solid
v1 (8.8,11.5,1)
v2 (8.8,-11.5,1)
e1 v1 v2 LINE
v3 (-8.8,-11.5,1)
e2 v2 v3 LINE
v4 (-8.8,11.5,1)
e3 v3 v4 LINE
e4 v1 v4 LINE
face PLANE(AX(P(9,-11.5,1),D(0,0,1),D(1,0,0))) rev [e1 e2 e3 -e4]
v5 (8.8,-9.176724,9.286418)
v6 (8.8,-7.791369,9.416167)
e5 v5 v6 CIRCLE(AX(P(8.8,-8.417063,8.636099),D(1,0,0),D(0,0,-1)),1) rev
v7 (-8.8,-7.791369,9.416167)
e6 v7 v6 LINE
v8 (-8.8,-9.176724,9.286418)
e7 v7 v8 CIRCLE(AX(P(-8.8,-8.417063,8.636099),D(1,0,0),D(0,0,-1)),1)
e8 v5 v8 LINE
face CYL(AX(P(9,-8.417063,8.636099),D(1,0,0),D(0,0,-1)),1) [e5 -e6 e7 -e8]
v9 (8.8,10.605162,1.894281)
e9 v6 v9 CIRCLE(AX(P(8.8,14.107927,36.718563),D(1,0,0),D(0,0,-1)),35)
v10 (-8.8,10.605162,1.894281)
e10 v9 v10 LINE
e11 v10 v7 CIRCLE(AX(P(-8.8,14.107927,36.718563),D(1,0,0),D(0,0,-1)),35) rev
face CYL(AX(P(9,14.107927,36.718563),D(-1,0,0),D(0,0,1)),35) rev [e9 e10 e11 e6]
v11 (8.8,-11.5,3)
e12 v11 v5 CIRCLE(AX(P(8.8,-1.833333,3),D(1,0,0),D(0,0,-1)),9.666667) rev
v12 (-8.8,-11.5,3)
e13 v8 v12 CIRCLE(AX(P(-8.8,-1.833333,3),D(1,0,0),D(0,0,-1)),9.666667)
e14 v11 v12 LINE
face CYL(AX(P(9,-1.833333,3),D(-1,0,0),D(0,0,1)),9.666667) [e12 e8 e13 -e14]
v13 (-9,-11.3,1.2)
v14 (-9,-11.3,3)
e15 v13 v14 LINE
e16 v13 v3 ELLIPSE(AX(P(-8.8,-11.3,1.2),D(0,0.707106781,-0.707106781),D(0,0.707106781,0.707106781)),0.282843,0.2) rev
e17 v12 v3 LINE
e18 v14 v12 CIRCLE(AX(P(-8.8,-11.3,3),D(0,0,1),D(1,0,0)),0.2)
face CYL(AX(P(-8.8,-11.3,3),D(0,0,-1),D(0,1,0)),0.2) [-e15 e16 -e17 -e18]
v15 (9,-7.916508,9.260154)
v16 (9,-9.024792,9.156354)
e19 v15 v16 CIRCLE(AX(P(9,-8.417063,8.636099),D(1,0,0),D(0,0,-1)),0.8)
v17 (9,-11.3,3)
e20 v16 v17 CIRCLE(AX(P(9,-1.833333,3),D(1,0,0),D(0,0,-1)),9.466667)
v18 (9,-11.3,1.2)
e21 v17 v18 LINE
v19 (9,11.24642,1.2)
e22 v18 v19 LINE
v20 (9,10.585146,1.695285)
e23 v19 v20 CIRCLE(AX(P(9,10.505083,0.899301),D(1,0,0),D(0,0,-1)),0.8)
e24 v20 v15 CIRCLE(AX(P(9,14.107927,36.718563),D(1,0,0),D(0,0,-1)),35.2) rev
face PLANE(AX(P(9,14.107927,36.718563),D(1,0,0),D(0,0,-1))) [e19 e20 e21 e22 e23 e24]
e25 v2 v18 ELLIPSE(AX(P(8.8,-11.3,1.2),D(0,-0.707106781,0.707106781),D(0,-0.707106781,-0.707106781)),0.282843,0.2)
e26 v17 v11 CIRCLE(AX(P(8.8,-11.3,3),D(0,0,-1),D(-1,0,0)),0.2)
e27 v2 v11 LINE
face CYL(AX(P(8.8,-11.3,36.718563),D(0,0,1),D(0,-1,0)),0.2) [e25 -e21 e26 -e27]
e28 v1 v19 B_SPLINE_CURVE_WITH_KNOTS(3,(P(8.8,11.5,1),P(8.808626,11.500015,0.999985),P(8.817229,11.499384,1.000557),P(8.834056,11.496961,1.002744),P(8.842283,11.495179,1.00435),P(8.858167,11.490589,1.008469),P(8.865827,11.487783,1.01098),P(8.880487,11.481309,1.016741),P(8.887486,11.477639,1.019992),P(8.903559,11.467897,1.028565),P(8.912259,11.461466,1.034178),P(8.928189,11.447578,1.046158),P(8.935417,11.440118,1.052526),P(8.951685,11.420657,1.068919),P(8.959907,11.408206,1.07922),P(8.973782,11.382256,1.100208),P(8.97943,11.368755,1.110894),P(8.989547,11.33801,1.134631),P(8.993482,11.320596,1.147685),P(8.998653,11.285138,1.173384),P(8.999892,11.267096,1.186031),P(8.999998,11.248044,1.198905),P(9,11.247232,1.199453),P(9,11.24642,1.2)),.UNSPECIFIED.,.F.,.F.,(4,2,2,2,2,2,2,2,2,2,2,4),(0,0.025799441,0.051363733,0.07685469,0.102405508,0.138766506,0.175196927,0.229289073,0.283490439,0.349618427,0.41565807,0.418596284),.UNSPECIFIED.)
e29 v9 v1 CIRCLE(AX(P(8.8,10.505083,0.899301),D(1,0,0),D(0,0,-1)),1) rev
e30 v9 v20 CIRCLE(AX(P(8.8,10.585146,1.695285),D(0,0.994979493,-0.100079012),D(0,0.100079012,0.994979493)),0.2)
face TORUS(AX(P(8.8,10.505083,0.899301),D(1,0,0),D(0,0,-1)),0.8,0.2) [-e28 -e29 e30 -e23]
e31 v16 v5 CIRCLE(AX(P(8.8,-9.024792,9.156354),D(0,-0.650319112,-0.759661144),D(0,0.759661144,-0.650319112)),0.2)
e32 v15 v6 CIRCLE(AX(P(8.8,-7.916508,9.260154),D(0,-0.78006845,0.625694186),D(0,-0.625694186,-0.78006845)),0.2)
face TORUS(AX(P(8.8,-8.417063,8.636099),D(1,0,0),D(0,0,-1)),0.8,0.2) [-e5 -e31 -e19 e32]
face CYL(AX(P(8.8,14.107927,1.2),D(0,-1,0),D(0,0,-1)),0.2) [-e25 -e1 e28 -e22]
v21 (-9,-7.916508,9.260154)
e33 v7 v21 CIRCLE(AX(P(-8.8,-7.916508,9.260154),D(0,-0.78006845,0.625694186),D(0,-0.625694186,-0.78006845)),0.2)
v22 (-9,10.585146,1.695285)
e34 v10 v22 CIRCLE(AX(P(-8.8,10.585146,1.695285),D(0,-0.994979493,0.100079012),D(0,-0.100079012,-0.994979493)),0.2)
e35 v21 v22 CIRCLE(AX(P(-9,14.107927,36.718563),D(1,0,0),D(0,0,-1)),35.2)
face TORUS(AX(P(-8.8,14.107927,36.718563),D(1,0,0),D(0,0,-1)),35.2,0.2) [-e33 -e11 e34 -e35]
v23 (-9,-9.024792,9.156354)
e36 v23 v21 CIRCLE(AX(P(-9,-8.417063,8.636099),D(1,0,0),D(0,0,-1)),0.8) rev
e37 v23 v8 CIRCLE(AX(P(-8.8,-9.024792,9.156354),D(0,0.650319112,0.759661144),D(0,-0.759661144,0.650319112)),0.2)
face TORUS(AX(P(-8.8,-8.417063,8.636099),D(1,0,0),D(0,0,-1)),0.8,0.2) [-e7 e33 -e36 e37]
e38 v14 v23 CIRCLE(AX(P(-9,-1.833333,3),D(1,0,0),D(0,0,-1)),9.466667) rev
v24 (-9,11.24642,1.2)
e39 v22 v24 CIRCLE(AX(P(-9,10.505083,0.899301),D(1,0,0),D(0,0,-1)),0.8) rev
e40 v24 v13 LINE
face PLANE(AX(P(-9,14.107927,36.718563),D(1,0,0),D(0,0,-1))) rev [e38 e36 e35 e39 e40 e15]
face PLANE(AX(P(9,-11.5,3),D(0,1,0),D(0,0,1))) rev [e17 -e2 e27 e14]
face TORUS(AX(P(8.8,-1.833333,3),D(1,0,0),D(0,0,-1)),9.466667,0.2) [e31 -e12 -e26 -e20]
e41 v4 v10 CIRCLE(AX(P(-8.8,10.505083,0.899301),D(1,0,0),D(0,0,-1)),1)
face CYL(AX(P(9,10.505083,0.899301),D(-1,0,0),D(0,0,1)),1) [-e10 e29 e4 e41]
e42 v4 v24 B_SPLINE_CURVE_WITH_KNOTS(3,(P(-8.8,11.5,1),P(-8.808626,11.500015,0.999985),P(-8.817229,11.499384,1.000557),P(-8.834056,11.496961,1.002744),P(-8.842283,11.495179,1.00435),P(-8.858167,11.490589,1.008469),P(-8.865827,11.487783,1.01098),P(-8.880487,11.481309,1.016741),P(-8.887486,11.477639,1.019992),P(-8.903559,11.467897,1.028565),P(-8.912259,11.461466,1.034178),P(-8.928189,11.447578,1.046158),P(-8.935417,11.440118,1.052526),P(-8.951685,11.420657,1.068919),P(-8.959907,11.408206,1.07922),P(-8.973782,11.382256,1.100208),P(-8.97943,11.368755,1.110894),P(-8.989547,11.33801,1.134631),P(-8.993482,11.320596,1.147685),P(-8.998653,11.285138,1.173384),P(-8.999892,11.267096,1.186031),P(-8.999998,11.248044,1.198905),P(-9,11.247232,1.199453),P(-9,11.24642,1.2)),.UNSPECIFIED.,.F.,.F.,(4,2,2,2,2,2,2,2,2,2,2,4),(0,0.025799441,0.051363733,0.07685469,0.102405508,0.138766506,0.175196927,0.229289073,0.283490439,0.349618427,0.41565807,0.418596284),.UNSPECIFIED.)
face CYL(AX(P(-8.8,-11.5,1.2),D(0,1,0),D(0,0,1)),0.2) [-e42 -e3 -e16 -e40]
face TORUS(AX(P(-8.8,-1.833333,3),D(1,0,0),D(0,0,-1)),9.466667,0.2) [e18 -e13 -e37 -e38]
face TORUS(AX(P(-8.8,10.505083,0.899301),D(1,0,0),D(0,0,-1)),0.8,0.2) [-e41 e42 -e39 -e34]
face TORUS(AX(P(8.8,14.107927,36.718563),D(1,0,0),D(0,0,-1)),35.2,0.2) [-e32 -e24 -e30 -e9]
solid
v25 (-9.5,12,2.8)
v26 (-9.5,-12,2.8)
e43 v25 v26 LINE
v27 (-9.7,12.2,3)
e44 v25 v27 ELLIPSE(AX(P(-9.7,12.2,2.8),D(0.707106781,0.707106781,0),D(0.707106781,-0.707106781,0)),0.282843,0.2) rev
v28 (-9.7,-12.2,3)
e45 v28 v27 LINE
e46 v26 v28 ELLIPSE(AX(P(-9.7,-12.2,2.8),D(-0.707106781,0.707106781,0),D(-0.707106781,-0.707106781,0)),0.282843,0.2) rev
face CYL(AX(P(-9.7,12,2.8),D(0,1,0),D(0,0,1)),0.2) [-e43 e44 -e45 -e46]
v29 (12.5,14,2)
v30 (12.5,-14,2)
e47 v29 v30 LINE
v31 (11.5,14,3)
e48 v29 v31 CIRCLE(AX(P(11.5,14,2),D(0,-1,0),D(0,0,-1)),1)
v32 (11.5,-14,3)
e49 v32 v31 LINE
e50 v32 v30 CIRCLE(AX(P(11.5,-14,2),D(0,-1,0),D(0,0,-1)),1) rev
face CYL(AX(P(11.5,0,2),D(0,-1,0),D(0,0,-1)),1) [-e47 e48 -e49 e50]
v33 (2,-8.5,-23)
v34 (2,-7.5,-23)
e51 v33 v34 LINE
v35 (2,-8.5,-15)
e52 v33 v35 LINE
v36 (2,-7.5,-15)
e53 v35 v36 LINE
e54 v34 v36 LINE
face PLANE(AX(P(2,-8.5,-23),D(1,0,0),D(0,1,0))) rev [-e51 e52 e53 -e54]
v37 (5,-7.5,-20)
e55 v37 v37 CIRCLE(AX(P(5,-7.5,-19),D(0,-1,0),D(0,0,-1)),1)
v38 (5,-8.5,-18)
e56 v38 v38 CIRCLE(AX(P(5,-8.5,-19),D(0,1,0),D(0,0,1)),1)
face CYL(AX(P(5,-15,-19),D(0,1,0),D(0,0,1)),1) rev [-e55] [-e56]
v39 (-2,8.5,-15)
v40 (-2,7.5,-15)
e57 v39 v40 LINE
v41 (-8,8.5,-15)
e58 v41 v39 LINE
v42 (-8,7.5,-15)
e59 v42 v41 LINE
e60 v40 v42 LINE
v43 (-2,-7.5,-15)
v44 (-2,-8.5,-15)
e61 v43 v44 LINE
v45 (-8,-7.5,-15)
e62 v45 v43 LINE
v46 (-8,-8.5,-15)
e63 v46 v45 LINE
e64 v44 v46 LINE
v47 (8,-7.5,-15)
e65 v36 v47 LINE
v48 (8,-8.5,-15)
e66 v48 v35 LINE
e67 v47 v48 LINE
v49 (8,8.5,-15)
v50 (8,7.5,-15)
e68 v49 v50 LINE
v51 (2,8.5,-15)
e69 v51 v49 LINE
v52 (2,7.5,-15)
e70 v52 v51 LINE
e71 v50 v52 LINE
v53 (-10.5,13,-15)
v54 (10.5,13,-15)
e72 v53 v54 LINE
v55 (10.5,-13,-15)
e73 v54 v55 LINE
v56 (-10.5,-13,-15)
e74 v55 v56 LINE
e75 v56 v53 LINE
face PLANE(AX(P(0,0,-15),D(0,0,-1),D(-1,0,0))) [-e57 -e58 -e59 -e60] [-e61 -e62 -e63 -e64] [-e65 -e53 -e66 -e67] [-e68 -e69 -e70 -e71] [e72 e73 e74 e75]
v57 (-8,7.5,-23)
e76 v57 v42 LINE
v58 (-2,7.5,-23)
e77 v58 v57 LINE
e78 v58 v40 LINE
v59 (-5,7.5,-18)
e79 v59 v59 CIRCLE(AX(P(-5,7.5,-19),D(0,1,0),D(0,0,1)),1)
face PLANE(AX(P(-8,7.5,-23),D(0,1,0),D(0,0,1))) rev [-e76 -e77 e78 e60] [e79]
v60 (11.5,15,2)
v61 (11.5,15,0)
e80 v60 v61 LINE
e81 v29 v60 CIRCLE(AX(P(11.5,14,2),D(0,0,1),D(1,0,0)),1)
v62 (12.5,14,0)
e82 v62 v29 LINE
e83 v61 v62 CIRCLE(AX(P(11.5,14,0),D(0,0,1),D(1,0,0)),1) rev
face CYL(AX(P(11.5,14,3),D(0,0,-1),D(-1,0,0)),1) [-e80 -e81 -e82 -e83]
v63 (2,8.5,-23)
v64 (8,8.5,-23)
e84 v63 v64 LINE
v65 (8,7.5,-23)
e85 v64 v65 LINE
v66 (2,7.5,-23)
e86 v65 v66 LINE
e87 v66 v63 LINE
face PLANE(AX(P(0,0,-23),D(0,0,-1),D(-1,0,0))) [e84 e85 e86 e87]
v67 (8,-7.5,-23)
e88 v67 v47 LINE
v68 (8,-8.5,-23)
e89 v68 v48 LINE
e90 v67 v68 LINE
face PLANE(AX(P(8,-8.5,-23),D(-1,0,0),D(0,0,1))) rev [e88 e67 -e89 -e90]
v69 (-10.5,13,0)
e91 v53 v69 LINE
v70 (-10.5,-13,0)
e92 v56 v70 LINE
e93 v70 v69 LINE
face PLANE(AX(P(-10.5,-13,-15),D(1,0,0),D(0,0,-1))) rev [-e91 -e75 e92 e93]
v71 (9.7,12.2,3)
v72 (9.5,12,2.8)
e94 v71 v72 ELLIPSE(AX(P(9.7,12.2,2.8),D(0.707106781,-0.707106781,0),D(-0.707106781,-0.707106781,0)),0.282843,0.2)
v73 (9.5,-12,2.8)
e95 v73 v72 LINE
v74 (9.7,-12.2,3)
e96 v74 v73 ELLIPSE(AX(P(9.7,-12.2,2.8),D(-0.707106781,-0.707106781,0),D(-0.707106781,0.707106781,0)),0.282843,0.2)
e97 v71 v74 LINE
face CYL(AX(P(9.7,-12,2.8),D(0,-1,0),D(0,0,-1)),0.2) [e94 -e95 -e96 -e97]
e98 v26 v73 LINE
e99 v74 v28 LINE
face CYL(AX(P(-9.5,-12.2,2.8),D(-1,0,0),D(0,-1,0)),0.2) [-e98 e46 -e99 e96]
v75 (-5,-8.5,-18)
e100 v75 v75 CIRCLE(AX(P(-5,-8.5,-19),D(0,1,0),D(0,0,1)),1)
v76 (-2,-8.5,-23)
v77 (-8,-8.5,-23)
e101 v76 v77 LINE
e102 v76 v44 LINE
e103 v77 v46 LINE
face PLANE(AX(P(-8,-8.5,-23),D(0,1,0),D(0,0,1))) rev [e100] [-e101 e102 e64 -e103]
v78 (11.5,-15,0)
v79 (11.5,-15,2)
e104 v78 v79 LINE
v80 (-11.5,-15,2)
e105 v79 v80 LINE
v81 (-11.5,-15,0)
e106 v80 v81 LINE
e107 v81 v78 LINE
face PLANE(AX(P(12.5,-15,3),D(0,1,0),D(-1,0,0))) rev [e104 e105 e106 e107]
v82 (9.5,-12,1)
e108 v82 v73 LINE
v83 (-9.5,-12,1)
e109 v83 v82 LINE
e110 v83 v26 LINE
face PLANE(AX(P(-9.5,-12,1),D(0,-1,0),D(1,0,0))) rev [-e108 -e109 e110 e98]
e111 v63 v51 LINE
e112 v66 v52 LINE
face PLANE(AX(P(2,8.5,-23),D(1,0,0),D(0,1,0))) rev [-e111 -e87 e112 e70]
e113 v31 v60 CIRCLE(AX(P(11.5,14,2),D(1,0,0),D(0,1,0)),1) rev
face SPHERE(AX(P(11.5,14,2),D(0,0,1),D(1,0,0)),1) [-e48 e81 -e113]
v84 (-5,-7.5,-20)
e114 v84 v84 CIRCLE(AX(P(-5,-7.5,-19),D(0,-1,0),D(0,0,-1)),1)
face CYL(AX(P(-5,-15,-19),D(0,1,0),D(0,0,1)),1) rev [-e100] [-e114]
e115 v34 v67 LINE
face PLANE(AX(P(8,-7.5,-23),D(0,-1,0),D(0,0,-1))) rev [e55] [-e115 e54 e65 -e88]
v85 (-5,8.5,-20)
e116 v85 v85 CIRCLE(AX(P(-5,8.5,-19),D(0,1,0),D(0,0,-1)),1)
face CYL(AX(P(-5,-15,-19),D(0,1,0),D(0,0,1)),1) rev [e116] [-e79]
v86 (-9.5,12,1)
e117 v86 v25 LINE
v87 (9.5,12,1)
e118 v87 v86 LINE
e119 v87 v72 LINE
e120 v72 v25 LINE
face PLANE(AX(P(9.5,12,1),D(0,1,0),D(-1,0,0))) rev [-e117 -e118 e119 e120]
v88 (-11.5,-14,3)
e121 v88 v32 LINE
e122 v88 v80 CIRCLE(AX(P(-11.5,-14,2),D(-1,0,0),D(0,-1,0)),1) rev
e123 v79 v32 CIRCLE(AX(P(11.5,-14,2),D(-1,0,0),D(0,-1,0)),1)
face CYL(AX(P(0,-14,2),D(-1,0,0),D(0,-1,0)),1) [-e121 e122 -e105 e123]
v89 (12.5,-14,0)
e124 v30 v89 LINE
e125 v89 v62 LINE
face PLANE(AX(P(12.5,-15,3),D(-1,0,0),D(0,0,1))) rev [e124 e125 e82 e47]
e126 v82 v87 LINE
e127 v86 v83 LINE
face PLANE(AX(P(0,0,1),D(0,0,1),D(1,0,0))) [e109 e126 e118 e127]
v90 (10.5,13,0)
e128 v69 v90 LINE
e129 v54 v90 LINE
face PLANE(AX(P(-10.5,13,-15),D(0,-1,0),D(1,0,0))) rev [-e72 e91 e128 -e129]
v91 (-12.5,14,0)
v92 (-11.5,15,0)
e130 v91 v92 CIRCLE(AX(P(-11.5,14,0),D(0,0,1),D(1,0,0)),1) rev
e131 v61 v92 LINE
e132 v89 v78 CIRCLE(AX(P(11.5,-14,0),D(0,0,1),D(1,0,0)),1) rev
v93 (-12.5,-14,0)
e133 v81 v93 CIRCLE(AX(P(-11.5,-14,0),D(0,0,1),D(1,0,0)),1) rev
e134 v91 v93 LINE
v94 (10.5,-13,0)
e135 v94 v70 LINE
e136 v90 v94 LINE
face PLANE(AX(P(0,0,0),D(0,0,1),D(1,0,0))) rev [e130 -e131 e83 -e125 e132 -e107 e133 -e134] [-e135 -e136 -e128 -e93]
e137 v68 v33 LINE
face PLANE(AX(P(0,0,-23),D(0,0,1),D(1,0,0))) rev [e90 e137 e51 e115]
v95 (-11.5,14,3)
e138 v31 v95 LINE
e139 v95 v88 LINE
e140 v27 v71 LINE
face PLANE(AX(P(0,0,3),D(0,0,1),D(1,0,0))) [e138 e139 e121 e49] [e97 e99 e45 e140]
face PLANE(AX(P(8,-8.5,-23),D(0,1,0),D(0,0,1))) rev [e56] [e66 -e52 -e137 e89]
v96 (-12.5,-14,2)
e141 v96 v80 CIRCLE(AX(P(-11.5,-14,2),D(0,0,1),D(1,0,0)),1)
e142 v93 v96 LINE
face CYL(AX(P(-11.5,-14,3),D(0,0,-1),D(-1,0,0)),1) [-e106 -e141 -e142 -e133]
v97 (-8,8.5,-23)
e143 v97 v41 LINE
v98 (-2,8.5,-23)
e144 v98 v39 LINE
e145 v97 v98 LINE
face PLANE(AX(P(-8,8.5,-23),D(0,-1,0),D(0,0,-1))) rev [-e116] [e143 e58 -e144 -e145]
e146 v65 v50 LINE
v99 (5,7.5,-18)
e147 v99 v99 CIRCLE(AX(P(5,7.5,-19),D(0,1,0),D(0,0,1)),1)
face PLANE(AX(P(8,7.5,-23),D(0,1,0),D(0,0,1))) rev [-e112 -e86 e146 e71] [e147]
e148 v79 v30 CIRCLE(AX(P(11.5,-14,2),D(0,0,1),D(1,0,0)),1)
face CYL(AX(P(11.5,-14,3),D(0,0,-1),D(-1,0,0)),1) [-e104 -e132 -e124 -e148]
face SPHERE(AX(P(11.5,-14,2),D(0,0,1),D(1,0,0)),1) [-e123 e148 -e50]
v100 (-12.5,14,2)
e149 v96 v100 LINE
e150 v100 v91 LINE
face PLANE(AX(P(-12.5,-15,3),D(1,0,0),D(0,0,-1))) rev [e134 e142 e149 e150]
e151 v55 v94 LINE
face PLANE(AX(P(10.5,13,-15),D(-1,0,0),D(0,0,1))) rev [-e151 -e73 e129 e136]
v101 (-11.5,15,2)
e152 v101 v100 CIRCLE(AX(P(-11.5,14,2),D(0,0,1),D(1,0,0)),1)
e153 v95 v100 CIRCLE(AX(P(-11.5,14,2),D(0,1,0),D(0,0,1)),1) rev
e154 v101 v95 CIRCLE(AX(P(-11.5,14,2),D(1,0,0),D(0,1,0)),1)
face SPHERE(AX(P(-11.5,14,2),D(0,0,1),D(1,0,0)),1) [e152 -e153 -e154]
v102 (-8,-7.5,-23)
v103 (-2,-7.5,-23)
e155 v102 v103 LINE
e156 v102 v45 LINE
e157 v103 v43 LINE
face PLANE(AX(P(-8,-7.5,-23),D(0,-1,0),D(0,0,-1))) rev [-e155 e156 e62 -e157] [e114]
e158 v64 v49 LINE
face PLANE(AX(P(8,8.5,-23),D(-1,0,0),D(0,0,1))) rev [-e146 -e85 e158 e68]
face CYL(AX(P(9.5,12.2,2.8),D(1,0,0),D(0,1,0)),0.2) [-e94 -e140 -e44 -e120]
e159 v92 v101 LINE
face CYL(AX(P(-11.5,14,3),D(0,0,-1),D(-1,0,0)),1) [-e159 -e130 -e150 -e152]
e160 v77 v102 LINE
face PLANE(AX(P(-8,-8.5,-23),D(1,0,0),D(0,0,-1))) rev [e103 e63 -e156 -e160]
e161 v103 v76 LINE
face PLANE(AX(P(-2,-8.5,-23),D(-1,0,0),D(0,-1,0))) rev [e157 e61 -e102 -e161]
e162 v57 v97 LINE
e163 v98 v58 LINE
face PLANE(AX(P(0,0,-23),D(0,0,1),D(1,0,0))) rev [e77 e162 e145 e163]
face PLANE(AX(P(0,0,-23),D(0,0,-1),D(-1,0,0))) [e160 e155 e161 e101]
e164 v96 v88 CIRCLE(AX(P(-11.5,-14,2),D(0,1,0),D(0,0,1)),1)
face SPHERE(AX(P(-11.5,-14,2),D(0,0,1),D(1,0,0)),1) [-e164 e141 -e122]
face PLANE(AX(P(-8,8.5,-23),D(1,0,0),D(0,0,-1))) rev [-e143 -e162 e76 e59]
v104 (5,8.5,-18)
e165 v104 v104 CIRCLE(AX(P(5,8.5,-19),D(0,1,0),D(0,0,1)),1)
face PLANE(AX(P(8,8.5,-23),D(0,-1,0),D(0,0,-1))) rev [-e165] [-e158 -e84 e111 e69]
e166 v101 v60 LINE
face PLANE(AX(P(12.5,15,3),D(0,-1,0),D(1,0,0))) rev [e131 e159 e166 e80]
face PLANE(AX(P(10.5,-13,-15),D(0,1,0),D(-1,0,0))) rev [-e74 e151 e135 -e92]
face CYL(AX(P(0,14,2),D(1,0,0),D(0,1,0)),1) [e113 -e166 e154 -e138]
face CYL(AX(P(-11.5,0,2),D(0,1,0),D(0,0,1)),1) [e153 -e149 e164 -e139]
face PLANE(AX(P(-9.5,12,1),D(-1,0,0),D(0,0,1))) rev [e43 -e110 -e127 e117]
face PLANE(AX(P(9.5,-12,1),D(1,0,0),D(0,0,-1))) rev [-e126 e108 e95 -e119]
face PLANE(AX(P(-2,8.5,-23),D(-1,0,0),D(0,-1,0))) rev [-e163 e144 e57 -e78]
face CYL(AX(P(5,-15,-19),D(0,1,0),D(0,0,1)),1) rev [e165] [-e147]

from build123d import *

# Parameters (mm, degrees)
ESQUISSE1_W             = 25
ESQUISSE1_H             = 30
BOSS_EXTRU_1_DEPTH      = 3
ESQUISSE2_W             = 21
ESQUISSE2_H             = 26
BOSS_EXTRU_2_DEPTH      = 15
CONG_1_R                = 1
CONG_2_R                = 1
ESQUISSE3_W             = 19
ESQUISSE3_H             = 24
ENL_V_MAT_EXTRU_1_DEPTH = 2
CONG_3_R                = 0.2
BOSS_EXTRU_4_DEPTH      = 9
CONG_6_R                = 1
CONG_7_R                = 0.2
ESQUISSE6_W             = 6
ESQUISSE6_H             = 1
BOSS_EXTRU_5_DEPTH      = 8
ESQUISSE7_R             = 1
ENL_V_MAT_EXTRU_2_DEPTH = 36.178118199


with BuildPart() as part:
    # Esquisse1 → Boss.-Extru.1 (new body)
    with BuildSketch(Plane.XY):
        Rectangle(ESQUISSE1_W, ESQUISSE1_H)
    extrude(amount=BOSS_EXTRU_1_DEPTH)

    # Esquisse2 → Boss.-Extru.2 (add)
    with BuildSketch(Plane(origin=(0, 0, 0), x_dir=(-1, 0, 0), z_dir=(0, 0, -1))):
        Rectangle(ESQUISSE2_W, ESQUISSE2_H)
    extrude(amount=BOSS_EXTRU_2_DEPTH)

    # Congé1
    cong_1_edges = [part.edges().sort_by_distance(p)[0] for p in [
        (12.5, 0, 3),
        (0, 15, 3),
        (-12.5, 0, 3),
        (0, -15, 3),
    ]]
    fillet(cong_1_edges, radius=CONG_1_R)

    # Congé2
    # the kernel refuses this fillet: 1 mm, written as the material it takes off along each edge
    with BuildSketch(Plane(origin=(11.5, -14, 2), x_dir=(1, 0, 0), z_dir=(0, -1, 0))) as cong_2_piece_1_section:
        Polygon((0, 0), (CONG_2_R, 0), (CONG_2_R, CONG_2_R), (0, CONG_2_R), align=None)
    cong_2_piece_1 = extrude(amount=CONG_2_R, mode=Mode.PRIVATE)
    cong_2_piece_1 = cong_2_piece_1 - Plane(origin=(11.5, -14, 2), x_dir=(-0.7071067811865475, 0, -0.7071067811865475), z_dir=(0, -1, 0)) * Sphere(CONG_2_R, mode=Mode.PRIVATE)
    add(cong_2_piece_1, mode=Mode.SUBTRACT)
    with BuildSketch(Plane(origin=(-11.5, -14, 2), x_dir=(-1, 0, 0), z_dir=(0, -1, 0))) as cong_2_piece_2_section:
        Polygon((0, 0), (CONG_2_R, 0), (CONG_2_R, -CONG_2_R), (0, -CONG_2_R), align=None)
    cong_2_piece_2 = extrude(amount=CONG_2_R, mode=Mode.PRIVATE)
    cong_2_piece_2 = cong_2_piece_2 - Plane(origin=(-11.5, -14, 2), x_dir=(0.7071067811865475, 0, -0.7071067811865475), z_dir=(0, -1, 0)) * Sphere(CONG_2_R, mode=Mode.PRIVATE)
    add(cong_2_piece_2, mode=Mode.SUBTRACT)
    with BuildSketch(Plane(origin=(11.5, 14, 2), x_dir=(0, 1, 0), z_dir=(1, 0, 0))) as cong_2_piece_3_section:
        Polygon((0, 0), (CONG_2_R, 0), (CONG_2_R, CONG_2_R), (0, CONG_2_R), align=None)
    cong_2_piece_3 = extrude(amount=CONG_2_R, mode=Mode.PRIVATE)
    cong_2_piece_3 = cong_2_piece_3 - Plane(origin=(11.5, 14, 2), x_dir=(0, -0.7071067811865475, -0.7071067811865475), z_dir=(1, 0, 0)) * Sphere(CONG_2_R, mode=Mode.PRIVATE)
    add(cong_2_piece_3, mode=Mode.SUBTRACT)
    with BuildSketch(Plane(origin=(-11.5, 14, 2), x_dir=(0, 1, 0), z_dir=(-1, 0, 0))) as cong_2_piece_4_section:
        Polygon((0, 0), (CONG_2_R, 0), (CONG_2_R, -CONG_2_R), (0, -CONG_2_R), align=None)
    cong_2_piece_4 = extrude(amount=CONG_2_R, mode=Mode.PRIVATE)
    cong_2_piece_4 = cong_2_piece_4 - Plane(origin=(-11.5, 14, 2), x_dir=(0, -0.7071067811865475, -0.7071067811865475), z_dir=(-1, 0, 0)) * Sphere(CONG_2_R, mode=Mode.PRIVATE)
    add(cong_2_piece_4, mode=Mode.SUBTRACT)
    with BuildSketch(Plane(origin=(-12.5, 15, -2.5), x_dir=(0, -1, 0), z_dir=(0, 0, 1)), Plane(origin=(-12.5, -15, -2.5), x_dir=(1, 0, 0), z_dir=(0, 0, 1))) as cong_2_piece_5:
        with BuildLine():
            CenterArc((CONG_2_R, CONG_2_R), CONG_2_R, 180, 90)
            Line((0, CONG_2_R), (0, 0))
            Line((0, 0), (CONG_2_R, 0))
        make_face()
    extrude(amount=4.5, mode=Mode.SUBTRACT)
    with BuildSketch(Plane(origin=(12.5, 15, -2.5), x_dir=(0, -1, 0), z_dir=(0, 0, 1)), Plane(origin=(12.5, -15, -2.5), x_dir=(-1, 0, 0), z_dir=(0, 0, 1))) as cong_2_piece_6:
        with BuildLine():
            CenterArc((CONG_2_R, -CONG_2_R), CONG_2_R, 90, 90)
            Line((0, -CONG_2_R), (0, 0))
            Line((0, 0), (CONG_2_R, 0))
        make_face()
    extrude(amount=4.5, mode=Mode.SUBTRACT)

    # Esquisse3 → Enlèv. mat.-Extru.1 (cut)
    with BuildSketch(Plane.XY.offset(3)):
        Rectangle(ESQUISSE3_W, ESQUISSE3_H)
    extrude(amount=-ENL_V_MAT_EXTRU_1_DEPTH, mode=Mode.SUBTRACT)

    # Congé3
    cong_3_edges = [part.edges().sort_by_distance(p)[0] for p in [
        (0, -12, 3),
        (9.5, 0, 3),
        (0, 12, 3),
        (-9.5, 0, 3),
    ]]
    fillet(cong_3_edges, radius=CONG_3_R)

    # Esquisse6 → Boss.-Extru.5 (add)
    with BuildSketch(Plane(origin=(0, 0, -15), x_dir=(-1, 0, 0), z_dir=(0, 0, -1))):
        with Locations((-5, 8)):
            Rectangle(ESQUISSE6_W, ESQUISSE6_H)
        with Locations((5, 8)):
            Rectangle(ESQUISSE6_W, ESQUISSE6_H)
        with Locations((5, -8)):
            Rectangle(ESQUISSE6_W, ESQUISSE6_H)
        with Locations((-5, -8)):
            Rectangle(ESQUISSE6_W, ESQUISSE6_H)
    extrude(amount=BOSS_EXTRU_5_DEPTH)

    # Esquisse7 → Enlèv. mat.-Extru.2 (cut, through all)
    with BuildSketch(Plane(origin=(0, 8.5, 0), x_dir=(1, 0, 0), z_dir=(0, 1, 0))):
        with Locations(Location((5, 19, 0), (0, 0, 270))):
            Circle(ESQUISSE7_R)
        with Locations(Location((-5, 19, 0), (0, 0, 270))):
            Circle(ESQUISSE7_R)
    extrude(amount=-ENL_V_MAT_EXTRU_2_DEPTH, mode=Mode.SUBTRACT)


with BuildPart() as body_2:
    # Esquisse5 → Boss.-Extru.4 (new, symmetric)
    with BuildSketch(Plane(origin=(0, 0, 0), x_dir=(0, 0, -1), z_dir=(1, 0, 0))):
        with BuildLine():
            Line((-1, 11.5), (-1.81585961, 11.5))
            ThreePointArc((-1.81585961, 11.5), (-4.325737909, 0.85255597), (-10, -8.5))
            ThreePointArc((-10, -8.5), (-6.807886553, -10.718401957), (-3, -11.5))
            Line((-3, -11.5), (-1, -11.5))
            Line((-1, -11.5), (-1, 11.5))
        make_face()
    extrude(amount=BOSS_EXTRU_4_DEPTH, both=True)

    # Congé6
    # the kernel refuses this fillet: 1 mm, written as the material it takes off along each edge
    with BuildSketch(Plane(origin=(-11.245669282, 11.5, 1.81585961), x_dir=(0, 0, -1), z_dir=(1, 0, 0))) as cong_6_piece_1:
        with BuildLine():
            CenterArc((0.916558206, -0.994916978), CONG_6_R, 95.779400144, 78.476879522)
            Line((-0.078421287, -0.894837966), (-0.098320877, -0.892836386))
            ThreePointArc((-0.098320877, -0.892836386), (-0.056263433, -0.445924521), (-0.019944402, 0.001490244))
            Line((-0.019944402, 0.001490244), (0, 0.02))
            ThreePointArc((0, 0.02), (0.407929805, 0.02), (0.813845638, 0.01989834))
            Line((0.813845638, 0.01989834), (0.81585961, 0))
        make_face()
    extrude(amount=22.491338564, mode=Mode.SUBTRACT)
    with BuildSketch(Plane(origin=(-11.458601046, -8.5, 10), x_dir=(0, -0.6881193570157783, -0.7255975127439398), z_dir=(1, 0, 0))) as cong_6_piece_2:
        with BuildLine():
            CenterArc((0.93257281, 0.998705405), CONG_6_R, 184.74826644, 88.167491153)
            Line((-0.063995197, 0.91592735), (-0.083926557, 0.914271789))
            ThreePointArc((-0.083926557, 0.914271789), (-0.048945373, 0.456779546), (-0.019967929, -0.001132174))
            Line((-0.019967929, -0.001132174), (-0.001017352, -0.019974108))
            ThreePointArc((-0.001017352, -0.019974108), (0.491720209, -0.032514416), (0.98445777, -0.019974108))
            Line((0.98445777, -0.019974108), (0.983440418, 0))
        make_face()
    extrude(amount=22.917202091, mode=Mode.SUBTRACT)

    # Congé7
    cong_7_edges = [body_2.edges().sort_by_distance(p)[0] for p in [
        (9, -10.900597474, 6.350994697),
        (-9, 0.861762657, 4.321971995),
        (9, 0.861762657, 4.321971995),
        (-9, -8.510312958, 9.63174172),
        (-9, 11.211969601, 1.606628319),
        (9, -8.510312958, 9.63174172),
        (9, 11.211969601, 1.606628319),
        (9, -11.5, 2),
        (-9, -10.900597474, 6.350994697),
        (-9, 0, 1),
        (-9, -11.5, 2),
        (9, 0, 1),
    ]]
    fillet(cong_7_edges, radius=CONG_7_R)


solid = Compound([part.part, body_2.part])
